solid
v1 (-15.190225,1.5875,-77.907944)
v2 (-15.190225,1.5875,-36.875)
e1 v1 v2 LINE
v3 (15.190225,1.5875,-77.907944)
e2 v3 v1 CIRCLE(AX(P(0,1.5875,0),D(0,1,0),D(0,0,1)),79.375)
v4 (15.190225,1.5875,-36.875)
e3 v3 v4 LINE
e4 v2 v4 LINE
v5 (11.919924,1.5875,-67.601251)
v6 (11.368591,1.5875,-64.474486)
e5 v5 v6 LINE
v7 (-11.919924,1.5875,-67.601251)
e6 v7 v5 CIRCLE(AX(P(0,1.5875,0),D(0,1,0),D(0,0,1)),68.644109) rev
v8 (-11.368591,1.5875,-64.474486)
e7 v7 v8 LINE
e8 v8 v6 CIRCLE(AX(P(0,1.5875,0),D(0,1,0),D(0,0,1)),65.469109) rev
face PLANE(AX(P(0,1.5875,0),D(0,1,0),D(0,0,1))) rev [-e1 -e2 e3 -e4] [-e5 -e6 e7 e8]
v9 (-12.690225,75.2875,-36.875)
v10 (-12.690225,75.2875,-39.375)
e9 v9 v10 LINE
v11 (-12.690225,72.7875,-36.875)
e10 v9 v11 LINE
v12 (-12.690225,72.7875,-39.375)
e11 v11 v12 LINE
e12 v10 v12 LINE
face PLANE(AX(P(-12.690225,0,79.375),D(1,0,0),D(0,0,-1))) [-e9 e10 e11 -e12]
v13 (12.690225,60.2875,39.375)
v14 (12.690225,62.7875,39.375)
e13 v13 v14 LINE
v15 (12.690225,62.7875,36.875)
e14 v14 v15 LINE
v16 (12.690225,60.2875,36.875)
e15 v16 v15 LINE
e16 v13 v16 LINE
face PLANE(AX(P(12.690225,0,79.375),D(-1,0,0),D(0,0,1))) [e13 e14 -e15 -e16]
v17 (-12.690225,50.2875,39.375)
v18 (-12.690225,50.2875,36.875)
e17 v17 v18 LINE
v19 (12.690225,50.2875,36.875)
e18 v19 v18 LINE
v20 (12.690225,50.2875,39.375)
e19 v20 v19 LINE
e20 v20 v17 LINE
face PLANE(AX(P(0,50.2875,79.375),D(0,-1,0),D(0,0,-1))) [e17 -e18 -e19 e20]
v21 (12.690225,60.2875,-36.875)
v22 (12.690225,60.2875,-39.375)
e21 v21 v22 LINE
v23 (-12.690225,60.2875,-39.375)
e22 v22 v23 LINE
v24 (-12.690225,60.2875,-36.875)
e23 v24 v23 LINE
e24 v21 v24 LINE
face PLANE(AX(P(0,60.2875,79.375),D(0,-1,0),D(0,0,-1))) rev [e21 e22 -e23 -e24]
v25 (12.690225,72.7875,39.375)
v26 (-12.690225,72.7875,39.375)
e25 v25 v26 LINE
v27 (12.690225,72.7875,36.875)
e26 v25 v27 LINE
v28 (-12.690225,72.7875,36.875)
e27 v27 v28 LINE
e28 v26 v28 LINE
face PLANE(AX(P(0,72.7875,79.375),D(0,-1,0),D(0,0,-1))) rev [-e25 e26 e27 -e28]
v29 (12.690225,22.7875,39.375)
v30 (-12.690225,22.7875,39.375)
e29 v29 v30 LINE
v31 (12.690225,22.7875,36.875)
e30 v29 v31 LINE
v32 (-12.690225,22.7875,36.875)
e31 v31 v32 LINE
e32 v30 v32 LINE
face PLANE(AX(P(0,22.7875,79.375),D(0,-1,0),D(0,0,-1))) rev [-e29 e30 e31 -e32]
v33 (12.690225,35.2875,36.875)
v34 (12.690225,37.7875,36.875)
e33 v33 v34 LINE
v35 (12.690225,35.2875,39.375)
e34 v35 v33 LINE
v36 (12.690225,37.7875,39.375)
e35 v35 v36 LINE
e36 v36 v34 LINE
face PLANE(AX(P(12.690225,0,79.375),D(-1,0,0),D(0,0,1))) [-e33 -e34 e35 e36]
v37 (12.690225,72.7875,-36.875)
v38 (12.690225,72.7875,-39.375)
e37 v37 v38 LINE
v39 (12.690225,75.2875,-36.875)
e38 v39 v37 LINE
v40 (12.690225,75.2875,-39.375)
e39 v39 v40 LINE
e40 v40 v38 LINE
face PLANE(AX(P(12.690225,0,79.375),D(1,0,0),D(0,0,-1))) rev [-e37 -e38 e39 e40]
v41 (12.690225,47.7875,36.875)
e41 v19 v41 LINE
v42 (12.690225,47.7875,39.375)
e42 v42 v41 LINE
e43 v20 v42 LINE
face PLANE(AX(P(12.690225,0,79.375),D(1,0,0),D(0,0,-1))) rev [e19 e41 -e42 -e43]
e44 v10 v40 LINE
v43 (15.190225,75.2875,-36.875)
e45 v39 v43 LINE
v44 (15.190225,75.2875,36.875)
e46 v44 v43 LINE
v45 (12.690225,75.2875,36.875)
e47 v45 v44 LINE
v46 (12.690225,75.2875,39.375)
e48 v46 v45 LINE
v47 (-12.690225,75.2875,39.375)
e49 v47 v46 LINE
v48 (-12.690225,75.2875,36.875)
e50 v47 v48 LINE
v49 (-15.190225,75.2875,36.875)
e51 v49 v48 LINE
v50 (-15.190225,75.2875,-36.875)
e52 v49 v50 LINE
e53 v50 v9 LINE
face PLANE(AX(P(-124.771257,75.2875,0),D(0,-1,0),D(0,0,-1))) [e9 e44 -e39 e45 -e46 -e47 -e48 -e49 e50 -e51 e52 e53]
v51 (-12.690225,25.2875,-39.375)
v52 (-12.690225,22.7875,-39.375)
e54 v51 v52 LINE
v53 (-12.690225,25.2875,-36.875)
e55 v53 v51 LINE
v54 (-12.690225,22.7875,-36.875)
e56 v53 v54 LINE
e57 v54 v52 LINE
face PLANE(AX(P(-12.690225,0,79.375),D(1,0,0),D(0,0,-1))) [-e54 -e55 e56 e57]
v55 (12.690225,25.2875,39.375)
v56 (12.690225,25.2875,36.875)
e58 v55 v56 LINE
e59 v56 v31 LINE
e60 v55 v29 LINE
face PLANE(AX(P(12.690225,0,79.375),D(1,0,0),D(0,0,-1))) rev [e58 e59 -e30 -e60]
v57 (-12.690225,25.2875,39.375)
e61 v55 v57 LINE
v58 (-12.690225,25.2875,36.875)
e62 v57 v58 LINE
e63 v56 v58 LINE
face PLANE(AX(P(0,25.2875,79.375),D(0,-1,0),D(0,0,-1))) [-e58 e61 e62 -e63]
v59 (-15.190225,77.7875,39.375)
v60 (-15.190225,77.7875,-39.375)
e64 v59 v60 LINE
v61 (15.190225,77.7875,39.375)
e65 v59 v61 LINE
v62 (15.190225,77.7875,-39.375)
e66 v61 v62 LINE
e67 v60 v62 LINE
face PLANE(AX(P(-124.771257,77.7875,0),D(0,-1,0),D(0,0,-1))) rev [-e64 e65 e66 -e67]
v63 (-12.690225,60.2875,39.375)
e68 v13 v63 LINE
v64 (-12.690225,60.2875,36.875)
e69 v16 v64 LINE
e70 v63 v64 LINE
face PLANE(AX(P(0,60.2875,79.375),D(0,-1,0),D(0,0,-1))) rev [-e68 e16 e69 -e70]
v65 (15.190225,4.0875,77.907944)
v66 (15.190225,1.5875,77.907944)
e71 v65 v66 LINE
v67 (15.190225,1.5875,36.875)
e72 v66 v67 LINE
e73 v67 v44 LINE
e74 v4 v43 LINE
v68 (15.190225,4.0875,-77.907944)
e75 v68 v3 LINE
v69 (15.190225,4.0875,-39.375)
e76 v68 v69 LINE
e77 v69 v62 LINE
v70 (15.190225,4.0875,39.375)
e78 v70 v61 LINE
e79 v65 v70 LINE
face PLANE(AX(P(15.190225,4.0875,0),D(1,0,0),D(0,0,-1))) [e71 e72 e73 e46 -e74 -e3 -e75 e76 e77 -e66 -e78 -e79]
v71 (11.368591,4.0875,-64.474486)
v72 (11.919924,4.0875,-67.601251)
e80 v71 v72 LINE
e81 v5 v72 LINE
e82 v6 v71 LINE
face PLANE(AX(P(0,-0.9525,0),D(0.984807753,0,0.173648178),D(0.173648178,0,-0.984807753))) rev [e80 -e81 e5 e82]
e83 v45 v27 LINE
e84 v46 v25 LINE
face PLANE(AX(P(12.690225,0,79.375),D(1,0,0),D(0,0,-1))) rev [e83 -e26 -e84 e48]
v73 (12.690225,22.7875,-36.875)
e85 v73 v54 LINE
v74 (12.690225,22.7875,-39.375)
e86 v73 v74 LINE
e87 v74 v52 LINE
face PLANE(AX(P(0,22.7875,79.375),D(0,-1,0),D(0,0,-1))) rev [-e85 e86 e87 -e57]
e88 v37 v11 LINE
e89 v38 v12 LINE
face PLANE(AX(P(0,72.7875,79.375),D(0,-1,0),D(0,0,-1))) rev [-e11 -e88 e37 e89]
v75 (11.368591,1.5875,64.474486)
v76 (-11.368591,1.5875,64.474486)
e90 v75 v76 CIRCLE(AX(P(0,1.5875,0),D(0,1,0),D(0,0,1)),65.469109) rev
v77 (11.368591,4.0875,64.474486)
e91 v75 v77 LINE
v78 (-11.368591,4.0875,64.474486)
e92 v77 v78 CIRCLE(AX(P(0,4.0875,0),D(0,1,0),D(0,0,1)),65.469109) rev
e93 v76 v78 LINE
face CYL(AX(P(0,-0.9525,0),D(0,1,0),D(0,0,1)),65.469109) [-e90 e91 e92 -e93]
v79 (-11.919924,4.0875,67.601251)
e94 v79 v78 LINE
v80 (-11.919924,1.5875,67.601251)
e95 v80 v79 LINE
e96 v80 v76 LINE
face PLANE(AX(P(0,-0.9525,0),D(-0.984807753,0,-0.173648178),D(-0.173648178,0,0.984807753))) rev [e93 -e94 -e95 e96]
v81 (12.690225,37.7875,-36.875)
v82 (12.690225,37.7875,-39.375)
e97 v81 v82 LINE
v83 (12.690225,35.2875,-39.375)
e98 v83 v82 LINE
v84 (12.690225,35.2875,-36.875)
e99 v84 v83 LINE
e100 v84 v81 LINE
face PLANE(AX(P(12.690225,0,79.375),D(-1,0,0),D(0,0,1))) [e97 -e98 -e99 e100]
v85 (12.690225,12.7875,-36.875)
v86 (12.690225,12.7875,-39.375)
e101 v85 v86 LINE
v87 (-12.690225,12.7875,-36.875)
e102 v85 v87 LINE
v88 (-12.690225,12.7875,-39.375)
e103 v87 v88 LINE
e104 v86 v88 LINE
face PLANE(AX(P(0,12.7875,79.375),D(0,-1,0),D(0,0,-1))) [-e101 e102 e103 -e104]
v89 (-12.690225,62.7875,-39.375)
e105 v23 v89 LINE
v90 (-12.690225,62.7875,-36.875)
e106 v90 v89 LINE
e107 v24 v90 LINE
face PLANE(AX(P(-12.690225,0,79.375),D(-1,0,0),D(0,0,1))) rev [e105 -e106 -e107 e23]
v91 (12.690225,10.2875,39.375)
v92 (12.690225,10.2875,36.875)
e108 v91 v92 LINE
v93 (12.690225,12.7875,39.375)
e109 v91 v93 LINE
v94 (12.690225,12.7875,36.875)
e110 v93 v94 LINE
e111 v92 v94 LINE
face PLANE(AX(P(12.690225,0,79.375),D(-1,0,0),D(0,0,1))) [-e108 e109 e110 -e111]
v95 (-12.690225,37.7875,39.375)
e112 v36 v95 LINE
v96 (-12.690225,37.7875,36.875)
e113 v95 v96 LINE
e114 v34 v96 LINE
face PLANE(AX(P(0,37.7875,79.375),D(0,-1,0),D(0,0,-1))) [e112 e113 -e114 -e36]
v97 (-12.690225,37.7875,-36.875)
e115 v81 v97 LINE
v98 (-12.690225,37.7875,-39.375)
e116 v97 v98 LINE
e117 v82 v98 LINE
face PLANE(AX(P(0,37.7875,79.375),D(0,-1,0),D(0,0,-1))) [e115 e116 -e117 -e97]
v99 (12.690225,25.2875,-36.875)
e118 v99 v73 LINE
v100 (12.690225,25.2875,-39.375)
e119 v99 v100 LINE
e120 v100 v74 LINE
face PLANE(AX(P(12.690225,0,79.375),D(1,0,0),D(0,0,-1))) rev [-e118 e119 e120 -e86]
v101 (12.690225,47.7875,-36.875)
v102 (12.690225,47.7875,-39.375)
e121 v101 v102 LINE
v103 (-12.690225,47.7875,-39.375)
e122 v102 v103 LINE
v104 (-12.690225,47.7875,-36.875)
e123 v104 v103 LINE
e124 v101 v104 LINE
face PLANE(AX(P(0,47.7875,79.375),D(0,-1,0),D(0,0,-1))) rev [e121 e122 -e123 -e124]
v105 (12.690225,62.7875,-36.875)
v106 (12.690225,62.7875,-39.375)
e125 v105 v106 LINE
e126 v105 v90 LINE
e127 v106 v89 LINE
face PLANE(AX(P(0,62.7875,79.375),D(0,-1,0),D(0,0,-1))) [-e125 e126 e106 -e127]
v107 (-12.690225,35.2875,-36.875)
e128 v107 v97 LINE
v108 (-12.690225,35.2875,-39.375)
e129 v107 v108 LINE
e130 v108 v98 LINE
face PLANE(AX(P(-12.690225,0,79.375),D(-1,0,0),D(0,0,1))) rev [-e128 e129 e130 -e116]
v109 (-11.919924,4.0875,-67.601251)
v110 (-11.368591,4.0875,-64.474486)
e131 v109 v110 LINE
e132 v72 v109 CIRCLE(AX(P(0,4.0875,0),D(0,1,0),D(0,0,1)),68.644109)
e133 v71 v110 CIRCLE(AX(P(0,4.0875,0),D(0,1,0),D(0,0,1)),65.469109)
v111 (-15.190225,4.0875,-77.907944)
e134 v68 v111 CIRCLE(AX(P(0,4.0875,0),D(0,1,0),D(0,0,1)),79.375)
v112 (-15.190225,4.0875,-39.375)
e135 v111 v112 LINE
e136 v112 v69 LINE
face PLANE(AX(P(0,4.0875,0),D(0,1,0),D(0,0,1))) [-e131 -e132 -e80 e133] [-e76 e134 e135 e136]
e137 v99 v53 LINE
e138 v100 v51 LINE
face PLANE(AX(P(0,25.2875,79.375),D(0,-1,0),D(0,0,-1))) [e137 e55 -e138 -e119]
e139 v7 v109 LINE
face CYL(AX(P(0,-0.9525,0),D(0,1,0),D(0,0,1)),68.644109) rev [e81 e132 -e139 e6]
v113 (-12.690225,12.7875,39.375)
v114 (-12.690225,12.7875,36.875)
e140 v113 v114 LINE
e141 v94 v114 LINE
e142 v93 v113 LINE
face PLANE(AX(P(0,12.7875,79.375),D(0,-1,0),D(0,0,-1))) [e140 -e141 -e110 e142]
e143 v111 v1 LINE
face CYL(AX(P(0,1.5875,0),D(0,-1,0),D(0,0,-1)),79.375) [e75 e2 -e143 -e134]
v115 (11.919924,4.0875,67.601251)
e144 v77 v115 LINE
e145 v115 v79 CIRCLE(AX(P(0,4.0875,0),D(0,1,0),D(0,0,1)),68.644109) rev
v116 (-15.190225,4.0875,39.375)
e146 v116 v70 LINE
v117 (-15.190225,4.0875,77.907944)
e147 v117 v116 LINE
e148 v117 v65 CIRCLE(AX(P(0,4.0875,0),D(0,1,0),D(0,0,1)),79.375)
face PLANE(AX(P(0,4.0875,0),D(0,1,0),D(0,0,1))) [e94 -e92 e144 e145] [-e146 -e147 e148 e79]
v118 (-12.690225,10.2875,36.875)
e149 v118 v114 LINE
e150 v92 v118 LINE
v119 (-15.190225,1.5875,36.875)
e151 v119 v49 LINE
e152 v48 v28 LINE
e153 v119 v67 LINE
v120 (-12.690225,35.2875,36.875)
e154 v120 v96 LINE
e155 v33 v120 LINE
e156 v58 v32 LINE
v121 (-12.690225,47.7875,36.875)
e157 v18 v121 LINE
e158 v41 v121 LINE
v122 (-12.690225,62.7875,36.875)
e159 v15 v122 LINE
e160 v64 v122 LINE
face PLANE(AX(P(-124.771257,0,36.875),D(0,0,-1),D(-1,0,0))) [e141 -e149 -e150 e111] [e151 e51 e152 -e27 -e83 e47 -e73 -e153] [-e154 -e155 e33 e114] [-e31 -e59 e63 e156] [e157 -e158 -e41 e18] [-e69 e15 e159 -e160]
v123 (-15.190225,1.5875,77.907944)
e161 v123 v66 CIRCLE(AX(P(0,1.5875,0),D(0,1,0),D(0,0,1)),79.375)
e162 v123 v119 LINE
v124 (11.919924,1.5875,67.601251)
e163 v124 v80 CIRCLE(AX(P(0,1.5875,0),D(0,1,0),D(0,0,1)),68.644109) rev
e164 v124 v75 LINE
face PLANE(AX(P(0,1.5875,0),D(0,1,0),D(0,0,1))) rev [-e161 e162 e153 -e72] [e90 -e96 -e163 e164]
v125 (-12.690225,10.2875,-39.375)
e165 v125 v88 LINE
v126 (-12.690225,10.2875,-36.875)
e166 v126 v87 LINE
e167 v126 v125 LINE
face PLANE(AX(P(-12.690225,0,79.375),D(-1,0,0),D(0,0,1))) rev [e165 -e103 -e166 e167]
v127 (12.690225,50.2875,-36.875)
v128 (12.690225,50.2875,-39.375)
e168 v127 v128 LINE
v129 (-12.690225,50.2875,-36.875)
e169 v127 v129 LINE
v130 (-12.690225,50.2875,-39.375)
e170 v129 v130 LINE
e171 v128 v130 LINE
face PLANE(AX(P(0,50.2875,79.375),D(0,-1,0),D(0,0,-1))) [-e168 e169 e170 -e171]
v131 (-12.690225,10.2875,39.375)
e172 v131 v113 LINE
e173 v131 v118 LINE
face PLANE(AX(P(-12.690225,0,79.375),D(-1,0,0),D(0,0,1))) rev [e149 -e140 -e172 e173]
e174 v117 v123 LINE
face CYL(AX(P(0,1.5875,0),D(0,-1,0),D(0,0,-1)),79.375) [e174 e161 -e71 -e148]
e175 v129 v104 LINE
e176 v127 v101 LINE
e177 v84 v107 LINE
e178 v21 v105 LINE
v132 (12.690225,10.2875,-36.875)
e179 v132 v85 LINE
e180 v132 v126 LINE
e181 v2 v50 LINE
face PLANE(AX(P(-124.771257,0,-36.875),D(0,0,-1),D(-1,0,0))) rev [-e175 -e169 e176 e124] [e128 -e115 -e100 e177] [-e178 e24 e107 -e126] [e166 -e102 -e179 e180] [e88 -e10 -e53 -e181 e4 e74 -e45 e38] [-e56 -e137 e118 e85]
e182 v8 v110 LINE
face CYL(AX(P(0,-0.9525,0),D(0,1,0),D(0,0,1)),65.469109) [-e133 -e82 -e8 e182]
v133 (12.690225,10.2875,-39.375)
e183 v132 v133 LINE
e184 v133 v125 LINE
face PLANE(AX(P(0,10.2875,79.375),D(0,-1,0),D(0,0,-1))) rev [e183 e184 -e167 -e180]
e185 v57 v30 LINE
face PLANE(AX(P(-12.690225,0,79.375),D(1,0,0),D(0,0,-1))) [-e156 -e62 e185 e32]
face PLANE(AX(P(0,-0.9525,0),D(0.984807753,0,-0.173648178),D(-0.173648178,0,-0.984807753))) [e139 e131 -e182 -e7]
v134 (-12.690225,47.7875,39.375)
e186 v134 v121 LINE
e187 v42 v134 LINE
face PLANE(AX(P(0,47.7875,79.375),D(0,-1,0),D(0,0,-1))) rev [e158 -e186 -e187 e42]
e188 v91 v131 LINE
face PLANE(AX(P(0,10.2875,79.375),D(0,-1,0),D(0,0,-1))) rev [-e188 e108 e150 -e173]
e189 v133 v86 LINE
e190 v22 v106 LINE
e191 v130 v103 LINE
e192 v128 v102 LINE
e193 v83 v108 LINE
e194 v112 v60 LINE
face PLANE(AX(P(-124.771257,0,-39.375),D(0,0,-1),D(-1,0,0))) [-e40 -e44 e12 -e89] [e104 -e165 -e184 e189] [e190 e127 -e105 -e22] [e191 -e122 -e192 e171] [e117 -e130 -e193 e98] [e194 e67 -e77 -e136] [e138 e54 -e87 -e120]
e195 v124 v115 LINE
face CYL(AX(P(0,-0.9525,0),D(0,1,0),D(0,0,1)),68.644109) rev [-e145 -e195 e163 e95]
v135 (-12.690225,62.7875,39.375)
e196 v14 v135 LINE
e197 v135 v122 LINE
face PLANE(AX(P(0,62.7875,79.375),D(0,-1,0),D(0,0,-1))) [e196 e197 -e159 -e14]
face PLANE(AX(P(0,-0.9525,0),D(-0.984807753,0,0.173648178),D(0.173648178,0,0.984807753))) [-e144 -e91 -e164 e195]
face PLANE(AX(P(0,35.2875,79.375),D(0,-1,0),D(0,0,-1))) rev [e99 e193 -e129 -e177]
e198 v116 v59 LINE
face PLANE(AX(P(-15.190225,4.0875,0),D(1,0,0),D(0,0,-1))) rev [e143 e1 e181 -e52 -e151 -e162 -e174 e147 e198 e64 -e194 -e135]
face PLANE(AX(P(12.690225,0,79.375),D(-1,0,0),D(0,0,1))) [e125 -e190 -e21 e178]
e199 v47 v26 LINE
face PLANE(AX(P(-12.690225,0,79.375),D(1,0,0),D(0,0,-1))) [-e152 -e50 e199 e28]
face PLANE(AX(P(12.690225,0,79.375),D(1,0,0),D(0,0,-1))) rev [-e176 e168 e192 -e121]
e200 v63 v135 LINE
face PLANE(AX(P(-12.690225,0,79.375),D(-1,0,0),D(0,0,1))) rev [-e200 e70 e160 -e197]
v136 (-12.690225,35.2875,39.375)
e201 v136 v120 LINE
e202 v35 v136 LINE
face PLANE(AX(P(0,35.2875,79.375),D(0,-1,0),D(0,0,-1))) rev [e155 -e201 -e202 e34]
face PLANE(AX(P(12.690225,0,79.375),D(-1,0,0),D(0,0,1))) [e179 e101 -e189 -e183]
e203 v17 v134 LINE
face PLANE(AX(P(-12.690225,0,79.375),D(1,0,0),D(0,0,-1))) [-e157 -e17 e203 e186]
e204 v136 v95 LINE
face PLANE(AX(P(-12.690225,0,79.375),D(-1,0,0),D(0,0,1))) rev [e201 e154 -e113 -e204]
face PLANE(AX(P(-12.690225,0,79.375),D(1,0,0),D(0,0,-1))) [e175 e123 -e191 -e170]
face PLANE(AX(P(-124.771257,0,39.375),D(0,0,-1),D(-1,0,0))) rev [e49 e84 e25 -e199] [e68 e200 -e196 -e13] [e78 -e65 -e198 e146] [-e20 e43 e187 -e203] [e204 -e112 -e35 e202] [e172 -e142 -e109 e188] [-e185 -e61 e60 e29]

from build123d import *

# Parameters (mm, degrees)
SKETCH1_R            = 1.5875
BOSS_EXTRUDE5_DEPTH  = 1.5875
FILLET2_R            = 2.54
FILLET3_R            = 2.54
FILLET4_R            = 5.08
CUT_EXTRUDE1_START   = -2.54
SKETCH2_R            = 2.38125
SKETCH2_R_2          = 1.5875
CUT_EXTRUDE1_DEPTH   = 2.54
SKETCH3_R            = 1.5875
CUT_EXTRUDE2_DEPTH   = 2.54
CUT_EXTRUDE3_DEPTH   = 2.54
SKETCH5_W            = 15
SKETCH5_H            = 34.925
CUT_EXTRUDE4_DEPTH   = 109.650407999
FILLET5_R            = 7.62
FILLET6_R            = 7.62
BOSS_EXTRUDE6_START  = -1.5875
BOSS_EXTRUDE6_DEPTH  = 1.5875
SKETCH7_R            = 79.375
CUT_EXTRUDE5_DEPTH   = 0.5875
BOSS_EXTRUDE7_START  = -1
SKETCH8_R            = 1.5875
SKETCH8_R_2          = 2.38125
BOSS_EXTRUDE7_DEPTH  = 1
SKETCH9_R            = 1.5875
CUT_EXTRUDE7_DEPTH   = 2.54
BOSS_EXTRUDE8_START  = -1
BOSS_EXTRUDE8_DEPTH  = 1
CUT_EXTRUDE9_START   = -2.54
CUT_EXTRUDE9_DEPTH   = 2.54
BOSS_EXTRUDE9_START  = -1
BOSS_EXTRUDE9_DEPTH  = 1
CUT_EXTRUDE10_START  = -2.54
CUT_EXTRUDE10_DEPTH  = 2.54
BOSS_EXTRUDE10_START = -1
BOSS_EXTRUDE10_DEPTH = 1
CUT_EXTRUDE11_START  = -2.54
CUT_EXTRUDE11_DEPTH  = 2.54
BOSS_EXTRUDE11_START = -1
BOSS_EXTRUDE11_DEPTH = 1
BOSS_EXTRUDE13_DEPTH = 2.5
SKETCH19_W           = 73.75
SKETCH19_H           = 2.5
SKETCH19_W_2         = 2.5
SKETCH19_H_2         = 76.2
BOSS_EXTRUDE14_DEPTH = 30.380450628
CUT_EXTRUDE12_START  = -2.5
SKETCH20_R           = 79.375
CUT_EXTRUDE12_DEPTH  = 2.5
SKETCH21_W           = 25.380450628
SKETCH21_H           = 2.5
CUT_EXTRUDE15_DEPTH  = 143.7697468


with BuildPart() as part:
    # Sketch1 → Boss-Extrude5 (new body)
    with BuildSketch(Plane(origin=(0, 0, 0), x_dir=(1, 0, 0), z_dir=(0, 1, 0))):
        with BuildLine():
            ThreePointArc((-63.5, -47.625), (-35.497579143, -70.995158286), (0, -79.375))
            ThreePointArc((0, -79.375), (35.497579143, -70.995158286), (63.5, -47.625))
            Line((63.5, -47.625), (50.8, -47.625))
            Line((50.8, -47.625), (50.8, 22.225))
            Line((50.8, 22.225), (76.2, 22.225))
            ThreePointArc((76.2, 22.225), (0, 79.375), (-76.2, 22.225))
            Line((-76.2, 22.225), (-50.8, 22.225))
            Line((-50.8, 22.225), (-50.8, -47.625))
            Line((-50.8, -47.625), (-63.5, -47.625))
        make_face()
        with Locations(Location((-7.14375, -66.675, 0), (0, 0, 270))):
            Circle(SKETCH1_R, mode=Mode.SUBTRACT)
        with BuildLine():
            ThreePointArc((8.73125, -66.675), (7.14375, -68.2625), (5.55625, -66.675))
            ThreePointArc((5.55625, -66.675), (7.14375, -65.0875), (8.73125, -66.675))
        make_face(mode=Mode.SUBTRACT)
        with Locations(Location((-7.14375, 66.675, 0), (0, 0, 270))):
            Circle(SKETCH1_R, mode=Mode.SUBTRACT)
        with Locations(Location((7.14375, 66.675, 0), (0, 0, 270))):
            Circle(SKETCH1_R, mode=Mode.SUBTRACT)
    extrude(amount=BOSS_EXTRUDE5_DEPTH)

    # Fillet2
    fillet2_edges = [part.edges().sort_by_distance(p)[0] for p in [
        (-63.5, 0.79375, 47.625),
    ]]
    fillet(fillet2_edges, radius=FILLET2_R)

    # Fillet3
    fillet3_edges = [part.edges().sort_by_distance(p)[0] for p in [
        (63.5, 0.79375, 47.625),
    ]]
    fillet(fillet3_edges, radius=FILLET3_R)

    # Fillet4
    fillet4_edges = [part.edges().sort_by_distance(p)[0] for p in [
        (-76.2, 0.79375, -22.225),
        (76.2, 0.79375, -22.225),
    ]]
    fillet(fillet4_edges, radius=FILLET4_R)

    # Sketch2 → Cut-Extrude1 (cut)
    # profile 1 of 10: a face of its own
    with BuildSketch(Plane(origin=(0, 1.5875, 0), x_dir=(1, 0, 0), z_dir=(0, 1, 0)).offset(CUT_EXTRUDE1_START)):
        with BuildLine():
            Line((-61.088622125, 27.654457796), (-59.642408406, 26.999765402))
            ThreePointArc((-59.642408406, 26.999765402), (-52.384826382, 39.268743005), (-42.643785254, 49.676068599))
            Line((-42.643785254, 49.676068599), (-43.677815048, 50.880617741))
            Line((-43.677815048, 50.880617741), (-44.711844841, 52.085166883))
            ThreePointArc((-44.711844841, 52.085166883), (-54.925289002, 41.173126022), (-62.534835843, 28.309150189))
            Line((-62.534835843, 28.309150189), (-61.088622125, 27.654457796))
        make_face()
    # profile 2 of 10: a face of its own
    with BuildSketch(Plane(origin=(0, 1.5875, 0), x_dir=(1, 0, 0), z_dir=(0, 1, 0)).offset(CUT_EXTRUDE1_START)):
        with BuildLine():
            Line((-39.077069744, 54.493774041), (-38.151958122, 53.203686937))
            ThreePointArc((-38.151958122, 53.203686937), (-25.732218917, 60.200142208), (-12.092567045, 64.342629994))
            Line((-12.092567045, 64.342629994), (-12.385788543, 65.902815048))
            Line((-12.385788543, 65.902815048), (-12.679010041, 67.463000102))
            ThreePointArc((-12.679010041, 67.463000102), (-26.980132574, 63.119617589), (-40.002181367, 55.783861145))
            Line((-40.002181367, 55.783861145), (-39.077069744, 54.493774041))
        make_face()
    # profile 3 of 10: a face of its own
    with BuildSketch(Plane(origin=(0, 1.5875, 0), x_dir=(1, 0, 0), z_dir=(0, 1, 0)).offset(CUT_EXTRUDE1_START)):
        with Locations(Location((-7.14375, 66.675, 0), (0, 0, 270))):
            Circle(SKETCH2_R)
        with Locations((-7.14375, 66.675)):
            Circle(SKETCH2_R_2, mode=Mode.SUBTRACT)
    # profile 4 of 10: a face of its own
    with BuildSketch(Plane(origin=(0, 1.5875, 0), x_dir=(1, 0, 0), z_dir=(0, 1, 0)).offset(CUT_EXTRUDE1_START)):
        with Locations(Location((7.14375, 66.675, 0), (0, 0, 270))):
            Circle(SKETCH2_R)
        with Locations((7.14375, 66.675)):
            Circle(SKETCH2_R_2, mode=Mode.SUBTRACT)
    # profile 5 of 10: a face of its own
    with BuildSketch(Plane(origin=(0, 1.5875, 0), x_dir=(1, 0, 0), z_dir=(0, 1, 0)).offset(CUT_EXTRUDE1_START)):
        with BuildLine():
            ThreePointArc((12.679010041, 67.463000102), (26.980132574, 63.119617589), (40.002181367, 55.783861145))
            Line((40.002181367, 55.783861145), (39.077069744, 54.493774041))
            Line((39.077069744, 54.493774041), (38.151958122, 53.203686937))
            ThreePointArc((38.151958122, 53.203686937), (25.732218917, 60.200142208), (12.092567045, 64.342629994))
            Line((12.092567045, 64.342629994), (12.385788543, 65.902815048))
            Line((12.385788543, 65.902815048), (12.679010041, 67.463000102))
        make_face()
    # profile 6 of 10: a face of its own
    with BuildSketch(Plane(origin=(0, 1.5875, 0), x_dir=(1, 0, 0), z_dir=(0, 1, 0)).offset(CUT_EXTRUDE1_START)):
        with BuildLine():
            ThreePointArc((44.711844841, 52.085166883), (54.925289002, 41.173126022), (62.534835843, 28.309150189))
            Line((62.534835843, 28.309150189), (59.642408406, 26.999765402))
            ThreePointArc((59.642408406, 26.999765402), (52.384826382, 39.268743005), (42.643785254, 49.676068599))
            Line((42.643785254, 49.676068599), (43.677815048, 50.880617741))
            Line((43.677815048, 50.880617741), (44.711844841, 52.085166883))
        make_face()
    # profile 7 of 10: a face of its own
    with BuildSketch(Plane(origin=(0, 1.5875, 0), x_dir=(1, 0, 0), z_dir=(0, 1, 0)).offset(CUT_EXTRUDE1_START)):
        with BuildLine():
            ThreePointArc((-12.679010041, -67.463000102), (-26.980132574, -63.119617589), (-40.002181367, -55.783861145))
            Line((-40.002181367, -55.783861145), (-39.077069744, -54.493774041))
            Line((-39.077069744, -54.493774041), (-38.151958122, -53.203686937))
            ThreePointArc((-38.151958122, -53.203686937), (-25.732218917, -60.200142208), (-12.092567045, -64.342629994))
            Line((-12.092567045, -64.342629994), (-12.385788543, -65.902815048))
            Line((-12.385788543, -65.902815048), (-12.679010041, -67.463000102))
        make_face()
    # profile 8 of 10: a face of its own
    with BuildSketch(Plane(origin=(0, 1.5875, 0), x_dir=(1, 0, 0), z_dir=(0, 1, 0)).offset(CUT_EXTRUDE1_START)):
        with Locations(Location((-7.14375, -66.675, 0), (0, 0, 270))):
            Circle(SKETCH2_R)
        with Locations((-7.14375, -66.675)):
            Circle(SKETCH2_R_2, mode=Mode.SUBTRACT)
    # profile 9 of 10: a face of its own
    with BuildSketch(Plane(origin=(0, 1.5875, 0), x_dir=(1, 0, 0), z_dir=(0, 1, 0)).offset(CUT_EXTRUDE1_START)):
        with Locations(Location((7.14375, -66.675, 0), (0, 0, 270))):
            Circle(SKETCH2_R)
        with Locations((7.14375, -66.675)):
            Circle(SKETCH2_R_2, mode=Mode.SUBTRACT)
    # profile 10 of 10: a face of its own
    with BuildSketch(Plane(origin=(0, 1.5875, 0), x_dir=(1, 0, 0), z_dir=(0, 1, 0)).offset(CUT_EXTRUDE1_START)):
        with BuildLine():
            ThreePointArc((12.092567045, -64.342629994), (25.732218917, -60.200142208), (38.151958122, -53.203686937))
            Line((38.151958122, -53.203686937), (39.077069744, -54.493774041))
            Line((39.077069744, -54.493774041), (40.002181367, -55.783861145))
            ThreePointArc((40.002181367, -55.783861145), (26.980132574, -63.119617589), (12.679010041, -67.463000102))
            Line((12.679010041, -67.463000102), (12.385788543, -65.902815048))
            Line((12.385788543, -65.902815048), (12.092567045, -64.342629994))
        make_face()
    extrude(amount=CUT_EXTRUDE1_DEPTH, mode=Mode.SUBTRACT)

    # Sketch3 → Cut-Extrude2 (cut)
    with BuildSketch(Plane(origin=(0, 1.5875, 0), x_dir=(1, 0, 0), z_dir=(0, 1, 0))):
        with Locations(Location((-44.45, -47.625, 0), (0, 0, 270))):
            Circle(SKETCH3_R)
        with Locations(Location((-44.45, 22.225, 0), (0, 0, 270))):
            Circle(SKETCH3_R)
        with Locations(Location((44.45, 22.225, 0), (0, 0, 270))):
            Circle(SKETCH3_R)
        with Locations(Location((44.45, -47.625, 0), (0, 0, 270))):
            Circle(SKETCH3_R)
    extrude(amount=-CUT_EXTRUDE2_DEPTH, mode=Mode.SUBTRACT)

    # Sketch4 → Cut-Extrude3 (cut)
    with BuildSketch(Plane(origin=(0, 1.5875, 0), x_dir=(1, 0, 0), z_dir=(0, 1, 0))):
        with BuildLine():
            ThreePointArc((-44.45, -11.1125), (-46.0375, -12.7), (-44.45, -14.2875))
            Line((-44.45, -14.2875), (-44.45, -11.1125))
        make_face()
        with BuildLine():
            Line((-44.45, -11.1125), (-44.45, -14.2875))
            ThreePointArc((-44.45, -14.2875), (-43.327467985, -13.822532015), (-42.8625, -12.7))
            ThreePointArc((-42.8625, -12.7), (-43.327467985, -11.577467985), (-44.45, -11.1125))
        make_face()
        with BuildLine():
            ThreePointArc((44.45, -11.1125), (42.8625, -12.7), (44.45, -14.2875))
            Line((44.45, -14.2875), (44.45, -11.1125))
        make_face()
        with BuildLine():
            Line((44.45, -11.1125), (44.45, -14.2875))
            ThreePointArc((44.45, -14.2875), (45.572532015, -13.822532015), (46.0375, -12.7))
            ThreePointArc((46.0375, -12.7), (45.572532015, -11.577467985), (44.45, -11.1125))
        make_face()
    extrude(amount=-CUT_EXTRUDE3_DEPTH, mode=Mode.SUBTRACT)

    # Sketch5 → Cut-Extrude4 (cut, through all)
    with BuildSketch(Plane(origin=(0, 1.5875, 0), x_dir=(1, 0, 0), z_dir=(0, 1, 0))):
        with Locations((-27.3, 4.7625)):
            Rectangle(SKETCH5_W, SKETCH5_H)
        with Locations((27.3, 4.7625)):
            Rectangle(SKETCH5_W, SKETCH5_H)
    extrude(amount=-CUT_EXTRUDE4_DEPTH, mode=Mode.SUBTRACT)

    # Fillet5
    # the kernel refuses this fillet: 7.62 mm, written as the material it adds along each edge
    with BuildSketch(Plane(origin=(-19.8, 1.5875, 12.7), x_dir=(0, 0, -1), z_dir=(0, -1, 0))) as fillet5_piece_1:
        with BuildLine():
            CenterArc((FILLET5_R, -FILLET5_R), FILLET5_R, 90, 90)
            Line((0, -FILLET5_R), (0, 0))
            Line((0, 0), (FILLET5_R, 0))
        make_face()
    extrude(amount=1.5875)
    with BuildSketch(Plane(origin=(-34.8, 1.5875, 12.7), x_dir=(0, 0, -1), z_dir=(0, -1, 0)), Plane(origin=(-19.8, 1.5875, -22.225), x_dir=(0, 0, 1), z_dir=(0, -1, 0)), Plane(origin=(-34.8, 1.5875, -22.225), x_dir=(1, 0, 0), z_dir=(0, -1, 0))) as fillet5_piece_2:
        with BuildLine():
            CenterArc((FILLET5_R, FILLET5_R), FILLET5_R, 180, 90)
            Line((0, FILLET5_R), (0, 0))
            Line((0, 0), (FILLET5_R, 0))
        make_face()
    extrude(amount=1.5875)

    # Fillet6
    # the kernel refuses this fillet: 7.62 mm, written as the material it adds along each edge
    with BuildSketch(Plane(origin=(34.8, 1.5875, 12.7), x_dir=(0, 0, -1), z_dir=(0, -1, 0)), Plane(origin=(34.8, 1.5875, -22.225), x_dir=(-1, 0, 0), z_dir=(0, -1, 0))) as fillet6_piece_1:
        with BuildLine():
            CenterArc((FILLET6_R, -FILLET6_R), FILLET6_R, 90, 90)
            Line((0, -FILLET6_R), (0, 0))
            Line((0, 0), (FILLET6_R, 0))
        make_face()
    extrude(amount=1.5875)
    with BuildSketch(Plane(origin=(19.8, 1.5875, -22.225), x_dir=(1, 0, 0), z_dir=(0, -1, 0)), Plane(origin=(19.8, 1.5875, 12.7), x_dir=(0, 0, -1), z_dir=(0, -1, 0))) as fillet6_piece_2:
        with BuildLine():
            CenterArc((FILLET6_R, FILLET6_R), FILLET6_R, 180, 90)
            Line((0, FILLET6_R), (0, 0))
            Line((0, 0), (FILLET6_R, 0))
        make_face()
    extrude(amount=1.5875)

    # Sketch6 → Boss-Extrude6 (add)
    with BuildSketch(Plane(origin=(0, 1.5875, 0), x_dir=(1, 0, 0), z_dir=(0, 1, 0)).offset(BOSS_EXTRUDE6_START)):
        with BuildLine():
            Line((-50.8, -60.989758362), (-50.8, 22.225))
            Line((-50.8, 22.225), (-69.095470184, 22.225))
            Line((-69.095470184, 22.225), (-69.095470184, 39.066694575))
            ThreePointArc((-69.095470184, 39.066694575), (-78.080435361, -14.277122916), (-50.8, -60.989758362))
        make_face()
        with BuildLine():
            Line((50.8, 22.225), (50.8, -60.989758362))
            ThreePointArc((50.8, -60.989758362), (71.877119534, -33.675960454), (79.375, 0))
            ThreePointArc((79.375, 0), (76.762111653, 20.198238526), (69.095470184, 39.066694575))
            Line((69.095470184, 39.066694575), (69.095470184, 22.225))
            Line((69.095470184, 22.225), (50.8, 22.225))
        make_face()
    extrude(amount=BOSS_EXTRUDE6_DEPTH)

    # Sketch7 → Cut-Extrude5 (cut)
    with BuildSketch(Plane.XZ):
        with Locations(Location((0, 0, 0), (0, 0, 270))):
            Circle(SKETCH7_R)
    extrude(amount=-CUT_EXTRUDE5_DEPTH, mode=Mode.SUBTRACT)

    # Sketch8 → Boss-Extrude7 (add)
    with BuildSketch(Plane(origin=(0, 1.5875, 0), x_dir=(1, 0, 0), z_dir=(0, 1, 0)).offset(BOSS_EXTRUDE7_START)):
        with Locations((-44.45, -12.7)):
            Circle(SKETCH8_R)
        with Locations((44.45, -12.7)):
            Circle(SKETCH8_R)
        with Locations((-7.14375, -66.675)):
            Circle(SKETCH8_R_2)
        with Locations((7.14375, -66.675)):
            Circle(SKETCH8_R_2)
        with Locations((-7.14375, 66.675)):
            Circle(SKETCH8_R_2)
        with Locations((7.14375, 66.675)):
            Circle(SKETCH8_R_2)
    extrude(amount=BOSS_EXTRUDE7_DEPTH)

    # Sketch9 → Cut-Extrude7 (cut)
    with BuildSketch(Plane(origin=(0, 1.5875, 0), x_dir=(1, 0, 0), z_dir=(0, 1, 0))):
        with Locations(Location((-44.45, -1.058333333, 0), (0, 0, 270))):
            Circle(SKETCH9_R)
        with Locations(Location((-44.45, -24.341666667, 0), (0, 0, 270))):
            Circle(SKETCH9_R)
        with Locations(Location((44.45, -24.341666667, 0), (0, 0, 270))):
            Circle(SKETCH9_R)
        with Locations(Location((44.45, -1.058333333, 0), (0, 0, 270))):
            Circle(SKETCH9_R)
    extrude(amount=-CUT_EXTRUDE7_DEPTH, mode=Mode.SUBTRACT)

    # Sketch10 → Boss-Extrude8 (add)
    with BuildSketch(Plane(origin=(0, 1.5875, 0), x_dir=(1, 0, 0), z_dir=(0, 1, 0)).offset(BOSS_EXTRUDE8_START)):
        with BuildLine():
            Line((-44.711844841, 52.085166883), (-42.643785254, 49.676068599))
            ThreePointArc((-42.643785254, 49.676068599), (-52.384826382, 39.268743005), (-59.642408406, 26.999765402))
            Line((-59.642408406, 26.999765402), (-62.534835843, 28.309150189))
            ThreePointArc((-62.534835843, 28.309150189), (-54.925289002, 41.173126022), (-44.711844841, 52.085166883))
        make_face()
        with BuildLine():
            Line((-12.679010041, 67.463000102), (-12.092567045, 64.342629994))
            ThreePointArc((-12.092567045, 64.342629994), (-25.732218917, 60.200142208), (-38.151958122, 53.203686937))
            Line((-38.151958122, 53.203686937), (-40.002181367, 55.783861145))
            ThreePointArc((-40.002181367, 55.783861145), (-26.980132574, 63.119617589), (-12.679010041, 67.463000102))
        make_face()
        with BuildLine():
            Line((12.092567045, 64.342629994), (12.679010041, 67.463000102))
            ThreePointArc((12.679010041, 67.463000102), (26.980132574, 63.119617589), (40.002181367, 55.783861145))
            Line((40.002181367, 55.783861145), (38.151958122, 53.203686937))
            ThreePointArc((38.151958122, 53.203686937), (25.732218917, 60.200142208), (12.092567045, 64.342629994))
        make_face()
        with BuildLine():
            Line((42.643785254, 49.676068599), (44.711844841, 52.085166883))
            ThreePointArc((44.711844841, 52.085166883), (54.925289002, 41.173126022), (62.534835843, 28.309150189))
            Line((62.534835843, 28.309150189), (59.642408406, 26.999765402))
            ThreePointArc((59.642408406, 26.999765402), (52.384826382, 39.268743005), (42.643785254, 49.676068599))
        make_face()
    extrude(amount=BOSS_EXTRUDE8_DEPTH)

    # Sketch11 → Cut-Extrude9 (cut)
    with BuildSketch(Plane(origin=(0, 1.5875, 0), x_dir=(1, 0, 0), z_dir=(0, 1, 0)).offset(CUT_EXTRUDE9_START)):
        with BuildLine():
            Line((11.919924408, -67.601250584), (11.368591443, -64.474485968))
            ThreePointArc((11.368591443, -64.474485968), (0, -65.46910884), (-11.368591443, -64.474485968))
            Line((-11.368591443, -64.474485968), (-11.919924408, -67.601250584))
            ThreePointArc((-11.919924408, -67.601250584), (0, -68.64410884), (11.919924408, -67.601250584))
        make_face()
        with BuildLine():
            Line((-11.919924408, 67.601250584), (-11.368591443, 64.474485968))
            ThreePointArc((-11.368591443, 64.474485968), (0, 65.46910884), (11.368591443, 64.474485968))
            Line((11.368591443, 64.474485968), (11.919924408, 67.601250584))
            ThreePointArc((11.919924408, 67.601250584), (0, 68.64410884), (-11.919924408, 67.601250584))
        make_face()
        with BuildLine():
            Line((-48.538714849, 48.538714849), (-46.293650819, 46.293650819))
            ThreePointArc((-46.293650819, 46.293650819), (-42.082731979, 50.152247023), (-37.551538139, 53.629154344))
            Line((-37.551538139, 53.629154344), (-39.372643325, 56.229962084))
            ThreePointArc((-39.372643325, 56.229962084), (-44.12358264, 52.584438129), (-48.538714849, 48.538714849))
        make_face()
        with BuildLine():
            ThreePointArc((-53.629154344, 37.551538139), (-50.152247023, 42.082731979), (-46.293650819, 46.293650819))
            Line((-46.293650819, 46.293650819), (-48.538714849, 48.538714849))
            ThreePointArc((-48.538714849, 48.538714849), (-52.584438129, 44.12358264), (-56.229962084, 39.372643325))
            Line((-56.229962084, 39.372643325), (-53.629154344, 37.551538139))
        make_face()
        with BuildLine():
            Line((-68.64410884, 0), (-65.46910884, 0))
            ThreePointArc((-65.46910884, 0), (-65.219979115, 5.706008808), (-64.474485968, 11.368591443))
            Line((-64.474485968, 11.368591443), (-67.601250584, 11.919924408))
            ThreePointArc((-67.601250584, 11.919924408), (-68.382897281, 5.982728291), (-68.64410884, 0))
        make_face()
        with BuildLine():
            ThreePointArc((-64.474485968, -11.368591443), (-65.219979115, -5.706008808), (-65.46910884, 0))
            Line((-65.46910884, 0), (-68.64410884, 0))
            ThreePointArc((-68.64410884, 0), (-68.382897281, -5.982728291), (-67.601250584, -11.919924408))
            Line((-67.601250584, -11.919924408), (-64.474485968, -11.368591443))
        make_face()
        with BuildLine():
            Line((67.601250584, 11.919924408), (64.474485968, 11.368591443))
            ThreePointArc((64.474485968, 11.368591443), (65.219979115, 5.706008808), (65.46910884, 0))
            ThreePointArc((65.46910884, 0), (65.219979115, -5.706008808), (64.474485968, -11.368591443))
            Line((64.474485968, -11.368591443), (67.601250584, -11.919924408))
            ThreePointArc((67.601250584, -11.919924408), (68.382897281, -5.982728291), (68.64410884, 0))
            ThreePointArc((68.64410884, 0), (68.382897281, 5.982728291), (67.601250584, 11.919924408))
        make_face()
        with BuildLine():
            Line((48.538714849, 48.538714849), (46.293650819, 46.293650819))
            ThreePointArc((46.293650819, 46.293650819), (50.152247023, 42.082731979), (53.629154344, 37.551538139))
            Line((53.629154344, 37.551538139), (56.229962084, 39.372643325))
            ThreePointArc((56.229962084, 39.372643325), (52.584438129, 44.12358264), (48.538714849, 48.538714849))
        make_face()
        with BuildLine():
            ThreePointArc((37.551538139, 53.629154344), (42.082731979, 50.152247023), (46.293650819, 46.293650819))
            Line((46.293650819, 46.293650819), (48.538714849, 48.538714849))
            ThreePointArc((48.538714849, 48.538714849), (44.12358264, 52.584438129), (39.372643325, 56.229962084))
            Line((39.372643325, 56.229962084), (37.551538139, 53.629154344))
        make_face()
    extrude(amount=CUT_EXTRUDE9_DEPTH, mode=Mode.SUBTRACT)

    # Sketch12 → Boss-Extrude9 (add)
    with BuildSketch(Plane(origin=(0, 1.5875, 0), x_dir=(1, 0, 0), z_dir=(0, 1, 0)).offset(BOSS_EXTRUDE9_START)):
        with BuildLine():
            ThreePointArc((-12.092567045, -64.342629994), (-14.887643702, -63.753919701), (-17.654380884, -63.043850199))
            Line((-17.654380884, -63.043850199), (-18.510550462, -66.101234482))
            ThreePointArc((-18.510550462, -66.101234482), (-15.609637167, -66.845739624), (-12.679010041, -67.463000102))
            Line((-12.679010041, -67.463000102), (-12.092567045, -64.342629994))
        make_face()
        with BuildLine():
            Line((18.510550462, -66.101234482), (17.654380884, -63.043850199))
            ThreePointArc((17.654380884, -63.043850199), (14.887643702, -63.753919701), (12.092567045, -64.342629994))
            Line((12.092567045, -64.342629994), (12.679010041, -67.463000102))
            ThreePointArc((12.679010041, -67.463000102), (15.609637167, -66.845739624), (18.510550462, -66.101234482))
        make_face()
    extrude(amount=BOSS_EXTRUDE9_DEPTH)

    # Sketch13 → Cut-Extrude10 (cut)
    with BuildSketch(Plane(origin=(0, 1.5875, 0), x_dir=(1, 0, 0), z_dir=(0, 1, 0)).offset(CUT_EXTRUDE10_START)):
        with BuildLine():
            Line((-52.584438129, -44.12358264), (-50.152247023, -42.082731979))
            ThreePointArc((-50.152247023, -42.082731979), (-56.697911418, -32.73455442), (-61.520838466, -22.391753989))
            Line((-61.520838466, -22.391753989), (-64.504362537, -23.477667944))
            ThreePointArc((-64.504362537, -23.477667944), (-59.447542075, -34.32205442), (-52.584438129, -44.12358264))
        make_face()
        with BuildLine():
            Line((64.504362537, -23.477667944), (61.520838466, -22.391753989))
            ThreePointArc((61.520838466, -22.391753989), (56.697911418, -32.73455442), (50.152247023, -42.082731979))
            Line((50.152247023, -42.082731979), (52.584438129, -44.12358264))
            ThreePointArc((52.584438129, -44.12358264), (59.447542075, -34.32205442), (64.504362537, -23.477667944))
        make_face()
        with BuildLine():
            Line((52.584438129, 44.12358264), (50.152247023, 42.082731979))
            ThreePointArc((50.152247023, 42.082731979), (56.697911418, 32.73455442), (61.520838466, 22.391753989))
            Line((61.520838466, 22.391753989), (64.504362537, 23.477667944))
            ThreePointArc((64.504362537, 23.477667944), (59.447542075, 34.32205442), (52.584438129, 44.12358264))
        make_face()
        with BuildLine():
            Line((23.477667944, 64.504362537), (22.391753989, 61.520838466))
            ThreePointArc((22.391753989, 61.520838466), (32.73455442, 56.697911418), (42.082731979, 50.152247023))
            Line((42.082731979, 50.152247023), (44.12358264, 52.584438129))
            ThreePointArc((44.12358264, 52.584438129), (34.32205442, 59.447542075), (23.477667944, 64.504362537))
        make_face()
        with BuildLine():
            Line((-44.12358264, 52.584438129), (-42.082731979, 50.152247023))
            ThreePointArc((-42.082731979, 50.152247023), (-32.73455442, 56.697911418), (-22.391753989, 61.520838466))
            Line((-22.391753989, 61.520838466), (-23.477667944, 64.504362537))
            ThreePointArc((-23.477667944, 64.504362537), (-34.32205442, 59.447542075), (-44.12358264, 52.584438129))
        make_face()
        with BuildLine():
            Line((-64.504362537, 23.477667944), (-61.520838466, 22.391753989))
            ThreePointArc((-61.520838466, 22.391753989), (-56.697911418, 32.73455442), (-50.152247023, 42.082731979))
            Line((-50.152247023, 42.082731979), (-52.584438129, 44.12358264))
            ThreePointArc((-52.584438129, 44.12358264), (-59.447542075, 34.32205442), (-64.504362537, 23.477667944))
        make_face()
    extrude(amount=CUT_EXTRUDE10_DEPTH, mode=Mode.SUBTRACT)

    # Sketch15 → Boss-Extrude10 (add)
    with BuildSketch(Plane(origin=(0, 1.5875, 0), x_dir=(1, 0, 0), z_dir=(0, 1, 0)).offset(BOSS_EXTRUDE10_START)):
        with BuildLine():
            Line((-52.584438129, 44.12358264), (-50.152247023, 42.082731979))
            ThreePointArc((-50.152247023, 42.082731979), (-46.293650819, 46.293650819), (-42.082731979, 50.152247023))
            Line((-42.082731979, 50.152247023), (-44.12358264, 52.584438129))
            ThreePointArc((-44.12358264, 52.584438129), (-48.538714849, 48.538714849), (-52.584438129, 44.12358264))
        make_face()
        with BuildLine():
            Line((44.12358264, 52.584438129), (42.082731979, 50.152247023))
            ThreePointArc((42.082731979, 50.152247023), (46.293650819, 46.293650819), (50.152247023, 42.082731979))
            Line((50.152247023, 42.082731979), (52.584438129, 44.12358264))
            ThreePointArc((52.584438129, 44.12358264), (48.538714849, 48.538714849), (44.12358264, 52.584438129))
        make_face()
    extrude(amount=BOSS_EXTRUDE10_DEPTH)

    # Sketch16 → Cut-Extrude11 (cut)
    with BuildSketch(Plane(origin=(0, 1.5875, 0), x_dir=(1, 0, 0), z_dir=(0, 1, 0)).offset(CUT_EXTRUDE11_START)):
        with BuildLine():
            Line((-23.477667944, -64.504362537), (-22.391753989, -61.520838466))
            ThreePointArc((-22.391753989, -61.520838466), (-32.73455442, -56.697911418), (-42.082731979, -50.152247022))
            Line((-42.082731979, -50.152247022), (-44.12358264, -52.584438129))
            ThreePointArc((-44.12358264, -52.584438129), (-34.32205442, -59.447542075), (-23.477667944, -64.504362537))
        make_face()
        with BuildLine():
            ThreePointArc((42.082731979, -50.152247022), (32.73455442, -56.697911418), (22.391753989, -61.520838466))
            Line((22.391753989, -61.520838466), (23.477667944, -64.504362537))
            ThreePointArc((23.477667944, -64.504362537), (34.32205442, -59.447542075), (44.12358264, -52.584438129))
            Line((44.12358264, -52.584438129), (42.082731979, -50.152247022))
        make_face()
    extrude(amount=CUT_EXTRUDE11_DEPTH, mode=Mode.SUBTRACT)

    # Sketch17 → Boss-Extrude11 (add)
    with BuildSketch(Plane(origin=(0, 1.5875, 0), x_dir=(1, 0, 0), z_dir=(0, 1, 0)).offset(BOSS_EXTRUDE11_START)):
        with BuildLine():
            Line((-11.919924408, -67.601250584), (-11.368591443, -64.474485968))
            ThreePointArc((-11.368591443, -64.474485968), (-16.944652234, -63.238303052), (-22.391753989, -61.520838466))
            Line((-22.391753989, -61.520838466), (-23.477667944, -64.504362537))
            ThreePointArc((-23.477667944, -64.504362537), (-17.766402702, -66.305117551), (-11.919924408, -67.601250584))
        make_face()
        with BuildLine():
            ThreePointArc((22.391753989, -61.520838466), (16.944652234, -63.238303052), (11.368591443, -64.474485968))
            Line((11.368591443, -64.474485968), (11.919924408, -67.601250584))
            ThreePointArc((11.919924408, -67.601250584), (17.766402702, -66.305117551), (23.477667944, -64.504362537))
            Line((23.477667944, -64.504362537), (22.391753989, -61.520838466))
        make_face()
    extrude(amount=BOSS_EXTRUDE11_DEPTH)

    # Sketch18 → Boss-Extrude13 (add)
    # profile 1 of 3: a face of its own
    with BuildSketch(Plane(origin=(0, 1.5875, 0), x_dir=(1, 0, 0), z_dir=(0, 1, 0))):
        with BuildLine():
            ThreePointArc((15.190225314, 77.907943625), (0, 79.375), (-15.190225314, 77.907943625))
            Line((-15.190225314, 77.907943625), (-15.190225314, 39.375))
            Line((-15.190225314, 39.375), (0, 39.375))
            Line((0, 39.375), (15.190225314, 39.375))
            Line((15.190225314, 39.375), (15.190225314, 77.907943625))
        make_face()
        with BuildLine():
            Line((11.919924408, 67.601250584), (11.368591443, 64.474485968))
            ThreePointArc((11.368591443, 64.474485968), (0, 65.46910884), (-11.368591443, 64.474485968))
            Line((-11.368591443, 64.474485968), (-11.919924408, 67.601250584))
            ThreePointArc((-11.919924408, 67.601250584), (0, 68.64410884), (11.919924408, 67.601250584))
        make_face(mode=Mode.SUBTRACT)
    # profile 2 of 3: a face of its own
    with BuildSketch(Plane(origin=(0, 1.5875, 0), x_dir=(1, 0, 0), z_dir=(0, 1, 0))):
        with BuildLine():
            Line((-15.190225314, -39.375), (-15.190225314, -77.907943625))
            ThreePointArc((-15.190225314, -77.907943625), (-7.630452141, -79.007384624), (0, -79.375))
            Line((0, -79.375), (0, -68.64410884))
            ThreePointArc((0, -68.64410884), (-5.982728291, -68.382897281), (-11.919924408, -67.601250584))
            Line((-11.919924408, -67.601250584), (-11.368591443, -64.474485968))
            ThreePointArc((-11.368591443, -64.474485968), (-5.706008808, -65.219979115), (0, -65.46910884))
            Line((0, -65.46910884), (0, -39.375))
            Line((0, -39.375), (-15.190225314, -39.375))
        make_face()
    # profile 3 of 3: a face of its own
    with BuildSketch(Plane(origin=(0, 1.5875, 0), x_dir=(1, 0, 0), z_dir=(0, 1, 0))):
        with BuildLine():
            Line((0, -68.64410884), (0, -79.375))
            ThreePointArc((0, -79.375), (7.630452141, -79.007384624), (15.190225314, -77.907943625))
            Line((15.190225314, -77.907943625), (15.190225314, -39.375))
            Line((15.190225314, -39.375), (0, -39.375))
            Line((0, -39.375), (0, -65.46910884))
            ThreePointArc((0, -65.46910884), (5.706008808, -65.219979115), (11.368591443, -64.474485968))
            Line((11.368591443, -64.474485968), (11.919924408, -67.601250584))
            ThreePointArc((11.919924408, -67.601250584), (5.982728291, -68.382897281), (0, -68.64410884))
        make_face()
    extrude(amount=BOSS_EXTRUDE13_DEPTH)

    # Sketch19 → Boss-Extrude14 (add)
    with BuildSketch(Plane(origin=(15.190225314, 0, 0), x_dir=(0, 0, -1), z_dir=(1, 0, 0))):
        Polygon((-39.375, 4.0875), (-39.375, 1.5875), (-36.875, 1.5875), (-36.875, 75.2875), (-36.875, 77.7875), (-39.375, 77.7875), align=None)
        with Locations((0, 76.5375)):
            Rectangle(SKETCH19_W, SKETCH19_H)
        with Locations((38.125, 39.6875)):
            Rectangle(SKETCH19_W_2, SKETCH19_H_2)
    extrude(amount=-BOSS_EXTRUDE14_DEPTH)

    # Sketch20 → Cut-Extrude12 (cut)
    with BuildSketch(Plane(origin=(0, 1.5875, 0), x_dir=(1, 0, 0), z_dir=(0, 1, 0)).offset(CUT_EXTRUDE12_START)):
        Circle(SKETCH20_R)
    extrude(amount=CUT_EXTRUDE12_DEPTH, mode=Mode.SUBTRACT)

    # Sketch21 → Cut-Extrude15 (cut, through all)
    with BuildSketch(Plane(origin=(0, 0, -39.375), x_dir=(-1, 0, 0), z_dir=(0, 0, -1))):
        with Locations((0, 74.0375)):
            Rectangle(SKETCH21_W, SKETCH21_H)
        with Locations((0, 61.5375)):
            Rectangle(SKETCH21_W, SKETCH21_H)
        with Locations((0, 49.0375)):
            Rectangle(SKETCH21_W, SKETCH21_H)
        with Locations((0, 36.5375)):
            Rectangle(SKETCH21_W, SKETCH21_H)
        with Locations((0, 24.0375)):
            Rectangle(SKETCH21_W, SKETCH21_H)
        with Locations((0, 11.5375)):
            Rectangle(SKETCH21_W, SKETCH21_H)
    extrude(amount=-CUT_EXTRUDE15_DEPTH, mode=Mode.SUBTRACT)


solid = part.part
